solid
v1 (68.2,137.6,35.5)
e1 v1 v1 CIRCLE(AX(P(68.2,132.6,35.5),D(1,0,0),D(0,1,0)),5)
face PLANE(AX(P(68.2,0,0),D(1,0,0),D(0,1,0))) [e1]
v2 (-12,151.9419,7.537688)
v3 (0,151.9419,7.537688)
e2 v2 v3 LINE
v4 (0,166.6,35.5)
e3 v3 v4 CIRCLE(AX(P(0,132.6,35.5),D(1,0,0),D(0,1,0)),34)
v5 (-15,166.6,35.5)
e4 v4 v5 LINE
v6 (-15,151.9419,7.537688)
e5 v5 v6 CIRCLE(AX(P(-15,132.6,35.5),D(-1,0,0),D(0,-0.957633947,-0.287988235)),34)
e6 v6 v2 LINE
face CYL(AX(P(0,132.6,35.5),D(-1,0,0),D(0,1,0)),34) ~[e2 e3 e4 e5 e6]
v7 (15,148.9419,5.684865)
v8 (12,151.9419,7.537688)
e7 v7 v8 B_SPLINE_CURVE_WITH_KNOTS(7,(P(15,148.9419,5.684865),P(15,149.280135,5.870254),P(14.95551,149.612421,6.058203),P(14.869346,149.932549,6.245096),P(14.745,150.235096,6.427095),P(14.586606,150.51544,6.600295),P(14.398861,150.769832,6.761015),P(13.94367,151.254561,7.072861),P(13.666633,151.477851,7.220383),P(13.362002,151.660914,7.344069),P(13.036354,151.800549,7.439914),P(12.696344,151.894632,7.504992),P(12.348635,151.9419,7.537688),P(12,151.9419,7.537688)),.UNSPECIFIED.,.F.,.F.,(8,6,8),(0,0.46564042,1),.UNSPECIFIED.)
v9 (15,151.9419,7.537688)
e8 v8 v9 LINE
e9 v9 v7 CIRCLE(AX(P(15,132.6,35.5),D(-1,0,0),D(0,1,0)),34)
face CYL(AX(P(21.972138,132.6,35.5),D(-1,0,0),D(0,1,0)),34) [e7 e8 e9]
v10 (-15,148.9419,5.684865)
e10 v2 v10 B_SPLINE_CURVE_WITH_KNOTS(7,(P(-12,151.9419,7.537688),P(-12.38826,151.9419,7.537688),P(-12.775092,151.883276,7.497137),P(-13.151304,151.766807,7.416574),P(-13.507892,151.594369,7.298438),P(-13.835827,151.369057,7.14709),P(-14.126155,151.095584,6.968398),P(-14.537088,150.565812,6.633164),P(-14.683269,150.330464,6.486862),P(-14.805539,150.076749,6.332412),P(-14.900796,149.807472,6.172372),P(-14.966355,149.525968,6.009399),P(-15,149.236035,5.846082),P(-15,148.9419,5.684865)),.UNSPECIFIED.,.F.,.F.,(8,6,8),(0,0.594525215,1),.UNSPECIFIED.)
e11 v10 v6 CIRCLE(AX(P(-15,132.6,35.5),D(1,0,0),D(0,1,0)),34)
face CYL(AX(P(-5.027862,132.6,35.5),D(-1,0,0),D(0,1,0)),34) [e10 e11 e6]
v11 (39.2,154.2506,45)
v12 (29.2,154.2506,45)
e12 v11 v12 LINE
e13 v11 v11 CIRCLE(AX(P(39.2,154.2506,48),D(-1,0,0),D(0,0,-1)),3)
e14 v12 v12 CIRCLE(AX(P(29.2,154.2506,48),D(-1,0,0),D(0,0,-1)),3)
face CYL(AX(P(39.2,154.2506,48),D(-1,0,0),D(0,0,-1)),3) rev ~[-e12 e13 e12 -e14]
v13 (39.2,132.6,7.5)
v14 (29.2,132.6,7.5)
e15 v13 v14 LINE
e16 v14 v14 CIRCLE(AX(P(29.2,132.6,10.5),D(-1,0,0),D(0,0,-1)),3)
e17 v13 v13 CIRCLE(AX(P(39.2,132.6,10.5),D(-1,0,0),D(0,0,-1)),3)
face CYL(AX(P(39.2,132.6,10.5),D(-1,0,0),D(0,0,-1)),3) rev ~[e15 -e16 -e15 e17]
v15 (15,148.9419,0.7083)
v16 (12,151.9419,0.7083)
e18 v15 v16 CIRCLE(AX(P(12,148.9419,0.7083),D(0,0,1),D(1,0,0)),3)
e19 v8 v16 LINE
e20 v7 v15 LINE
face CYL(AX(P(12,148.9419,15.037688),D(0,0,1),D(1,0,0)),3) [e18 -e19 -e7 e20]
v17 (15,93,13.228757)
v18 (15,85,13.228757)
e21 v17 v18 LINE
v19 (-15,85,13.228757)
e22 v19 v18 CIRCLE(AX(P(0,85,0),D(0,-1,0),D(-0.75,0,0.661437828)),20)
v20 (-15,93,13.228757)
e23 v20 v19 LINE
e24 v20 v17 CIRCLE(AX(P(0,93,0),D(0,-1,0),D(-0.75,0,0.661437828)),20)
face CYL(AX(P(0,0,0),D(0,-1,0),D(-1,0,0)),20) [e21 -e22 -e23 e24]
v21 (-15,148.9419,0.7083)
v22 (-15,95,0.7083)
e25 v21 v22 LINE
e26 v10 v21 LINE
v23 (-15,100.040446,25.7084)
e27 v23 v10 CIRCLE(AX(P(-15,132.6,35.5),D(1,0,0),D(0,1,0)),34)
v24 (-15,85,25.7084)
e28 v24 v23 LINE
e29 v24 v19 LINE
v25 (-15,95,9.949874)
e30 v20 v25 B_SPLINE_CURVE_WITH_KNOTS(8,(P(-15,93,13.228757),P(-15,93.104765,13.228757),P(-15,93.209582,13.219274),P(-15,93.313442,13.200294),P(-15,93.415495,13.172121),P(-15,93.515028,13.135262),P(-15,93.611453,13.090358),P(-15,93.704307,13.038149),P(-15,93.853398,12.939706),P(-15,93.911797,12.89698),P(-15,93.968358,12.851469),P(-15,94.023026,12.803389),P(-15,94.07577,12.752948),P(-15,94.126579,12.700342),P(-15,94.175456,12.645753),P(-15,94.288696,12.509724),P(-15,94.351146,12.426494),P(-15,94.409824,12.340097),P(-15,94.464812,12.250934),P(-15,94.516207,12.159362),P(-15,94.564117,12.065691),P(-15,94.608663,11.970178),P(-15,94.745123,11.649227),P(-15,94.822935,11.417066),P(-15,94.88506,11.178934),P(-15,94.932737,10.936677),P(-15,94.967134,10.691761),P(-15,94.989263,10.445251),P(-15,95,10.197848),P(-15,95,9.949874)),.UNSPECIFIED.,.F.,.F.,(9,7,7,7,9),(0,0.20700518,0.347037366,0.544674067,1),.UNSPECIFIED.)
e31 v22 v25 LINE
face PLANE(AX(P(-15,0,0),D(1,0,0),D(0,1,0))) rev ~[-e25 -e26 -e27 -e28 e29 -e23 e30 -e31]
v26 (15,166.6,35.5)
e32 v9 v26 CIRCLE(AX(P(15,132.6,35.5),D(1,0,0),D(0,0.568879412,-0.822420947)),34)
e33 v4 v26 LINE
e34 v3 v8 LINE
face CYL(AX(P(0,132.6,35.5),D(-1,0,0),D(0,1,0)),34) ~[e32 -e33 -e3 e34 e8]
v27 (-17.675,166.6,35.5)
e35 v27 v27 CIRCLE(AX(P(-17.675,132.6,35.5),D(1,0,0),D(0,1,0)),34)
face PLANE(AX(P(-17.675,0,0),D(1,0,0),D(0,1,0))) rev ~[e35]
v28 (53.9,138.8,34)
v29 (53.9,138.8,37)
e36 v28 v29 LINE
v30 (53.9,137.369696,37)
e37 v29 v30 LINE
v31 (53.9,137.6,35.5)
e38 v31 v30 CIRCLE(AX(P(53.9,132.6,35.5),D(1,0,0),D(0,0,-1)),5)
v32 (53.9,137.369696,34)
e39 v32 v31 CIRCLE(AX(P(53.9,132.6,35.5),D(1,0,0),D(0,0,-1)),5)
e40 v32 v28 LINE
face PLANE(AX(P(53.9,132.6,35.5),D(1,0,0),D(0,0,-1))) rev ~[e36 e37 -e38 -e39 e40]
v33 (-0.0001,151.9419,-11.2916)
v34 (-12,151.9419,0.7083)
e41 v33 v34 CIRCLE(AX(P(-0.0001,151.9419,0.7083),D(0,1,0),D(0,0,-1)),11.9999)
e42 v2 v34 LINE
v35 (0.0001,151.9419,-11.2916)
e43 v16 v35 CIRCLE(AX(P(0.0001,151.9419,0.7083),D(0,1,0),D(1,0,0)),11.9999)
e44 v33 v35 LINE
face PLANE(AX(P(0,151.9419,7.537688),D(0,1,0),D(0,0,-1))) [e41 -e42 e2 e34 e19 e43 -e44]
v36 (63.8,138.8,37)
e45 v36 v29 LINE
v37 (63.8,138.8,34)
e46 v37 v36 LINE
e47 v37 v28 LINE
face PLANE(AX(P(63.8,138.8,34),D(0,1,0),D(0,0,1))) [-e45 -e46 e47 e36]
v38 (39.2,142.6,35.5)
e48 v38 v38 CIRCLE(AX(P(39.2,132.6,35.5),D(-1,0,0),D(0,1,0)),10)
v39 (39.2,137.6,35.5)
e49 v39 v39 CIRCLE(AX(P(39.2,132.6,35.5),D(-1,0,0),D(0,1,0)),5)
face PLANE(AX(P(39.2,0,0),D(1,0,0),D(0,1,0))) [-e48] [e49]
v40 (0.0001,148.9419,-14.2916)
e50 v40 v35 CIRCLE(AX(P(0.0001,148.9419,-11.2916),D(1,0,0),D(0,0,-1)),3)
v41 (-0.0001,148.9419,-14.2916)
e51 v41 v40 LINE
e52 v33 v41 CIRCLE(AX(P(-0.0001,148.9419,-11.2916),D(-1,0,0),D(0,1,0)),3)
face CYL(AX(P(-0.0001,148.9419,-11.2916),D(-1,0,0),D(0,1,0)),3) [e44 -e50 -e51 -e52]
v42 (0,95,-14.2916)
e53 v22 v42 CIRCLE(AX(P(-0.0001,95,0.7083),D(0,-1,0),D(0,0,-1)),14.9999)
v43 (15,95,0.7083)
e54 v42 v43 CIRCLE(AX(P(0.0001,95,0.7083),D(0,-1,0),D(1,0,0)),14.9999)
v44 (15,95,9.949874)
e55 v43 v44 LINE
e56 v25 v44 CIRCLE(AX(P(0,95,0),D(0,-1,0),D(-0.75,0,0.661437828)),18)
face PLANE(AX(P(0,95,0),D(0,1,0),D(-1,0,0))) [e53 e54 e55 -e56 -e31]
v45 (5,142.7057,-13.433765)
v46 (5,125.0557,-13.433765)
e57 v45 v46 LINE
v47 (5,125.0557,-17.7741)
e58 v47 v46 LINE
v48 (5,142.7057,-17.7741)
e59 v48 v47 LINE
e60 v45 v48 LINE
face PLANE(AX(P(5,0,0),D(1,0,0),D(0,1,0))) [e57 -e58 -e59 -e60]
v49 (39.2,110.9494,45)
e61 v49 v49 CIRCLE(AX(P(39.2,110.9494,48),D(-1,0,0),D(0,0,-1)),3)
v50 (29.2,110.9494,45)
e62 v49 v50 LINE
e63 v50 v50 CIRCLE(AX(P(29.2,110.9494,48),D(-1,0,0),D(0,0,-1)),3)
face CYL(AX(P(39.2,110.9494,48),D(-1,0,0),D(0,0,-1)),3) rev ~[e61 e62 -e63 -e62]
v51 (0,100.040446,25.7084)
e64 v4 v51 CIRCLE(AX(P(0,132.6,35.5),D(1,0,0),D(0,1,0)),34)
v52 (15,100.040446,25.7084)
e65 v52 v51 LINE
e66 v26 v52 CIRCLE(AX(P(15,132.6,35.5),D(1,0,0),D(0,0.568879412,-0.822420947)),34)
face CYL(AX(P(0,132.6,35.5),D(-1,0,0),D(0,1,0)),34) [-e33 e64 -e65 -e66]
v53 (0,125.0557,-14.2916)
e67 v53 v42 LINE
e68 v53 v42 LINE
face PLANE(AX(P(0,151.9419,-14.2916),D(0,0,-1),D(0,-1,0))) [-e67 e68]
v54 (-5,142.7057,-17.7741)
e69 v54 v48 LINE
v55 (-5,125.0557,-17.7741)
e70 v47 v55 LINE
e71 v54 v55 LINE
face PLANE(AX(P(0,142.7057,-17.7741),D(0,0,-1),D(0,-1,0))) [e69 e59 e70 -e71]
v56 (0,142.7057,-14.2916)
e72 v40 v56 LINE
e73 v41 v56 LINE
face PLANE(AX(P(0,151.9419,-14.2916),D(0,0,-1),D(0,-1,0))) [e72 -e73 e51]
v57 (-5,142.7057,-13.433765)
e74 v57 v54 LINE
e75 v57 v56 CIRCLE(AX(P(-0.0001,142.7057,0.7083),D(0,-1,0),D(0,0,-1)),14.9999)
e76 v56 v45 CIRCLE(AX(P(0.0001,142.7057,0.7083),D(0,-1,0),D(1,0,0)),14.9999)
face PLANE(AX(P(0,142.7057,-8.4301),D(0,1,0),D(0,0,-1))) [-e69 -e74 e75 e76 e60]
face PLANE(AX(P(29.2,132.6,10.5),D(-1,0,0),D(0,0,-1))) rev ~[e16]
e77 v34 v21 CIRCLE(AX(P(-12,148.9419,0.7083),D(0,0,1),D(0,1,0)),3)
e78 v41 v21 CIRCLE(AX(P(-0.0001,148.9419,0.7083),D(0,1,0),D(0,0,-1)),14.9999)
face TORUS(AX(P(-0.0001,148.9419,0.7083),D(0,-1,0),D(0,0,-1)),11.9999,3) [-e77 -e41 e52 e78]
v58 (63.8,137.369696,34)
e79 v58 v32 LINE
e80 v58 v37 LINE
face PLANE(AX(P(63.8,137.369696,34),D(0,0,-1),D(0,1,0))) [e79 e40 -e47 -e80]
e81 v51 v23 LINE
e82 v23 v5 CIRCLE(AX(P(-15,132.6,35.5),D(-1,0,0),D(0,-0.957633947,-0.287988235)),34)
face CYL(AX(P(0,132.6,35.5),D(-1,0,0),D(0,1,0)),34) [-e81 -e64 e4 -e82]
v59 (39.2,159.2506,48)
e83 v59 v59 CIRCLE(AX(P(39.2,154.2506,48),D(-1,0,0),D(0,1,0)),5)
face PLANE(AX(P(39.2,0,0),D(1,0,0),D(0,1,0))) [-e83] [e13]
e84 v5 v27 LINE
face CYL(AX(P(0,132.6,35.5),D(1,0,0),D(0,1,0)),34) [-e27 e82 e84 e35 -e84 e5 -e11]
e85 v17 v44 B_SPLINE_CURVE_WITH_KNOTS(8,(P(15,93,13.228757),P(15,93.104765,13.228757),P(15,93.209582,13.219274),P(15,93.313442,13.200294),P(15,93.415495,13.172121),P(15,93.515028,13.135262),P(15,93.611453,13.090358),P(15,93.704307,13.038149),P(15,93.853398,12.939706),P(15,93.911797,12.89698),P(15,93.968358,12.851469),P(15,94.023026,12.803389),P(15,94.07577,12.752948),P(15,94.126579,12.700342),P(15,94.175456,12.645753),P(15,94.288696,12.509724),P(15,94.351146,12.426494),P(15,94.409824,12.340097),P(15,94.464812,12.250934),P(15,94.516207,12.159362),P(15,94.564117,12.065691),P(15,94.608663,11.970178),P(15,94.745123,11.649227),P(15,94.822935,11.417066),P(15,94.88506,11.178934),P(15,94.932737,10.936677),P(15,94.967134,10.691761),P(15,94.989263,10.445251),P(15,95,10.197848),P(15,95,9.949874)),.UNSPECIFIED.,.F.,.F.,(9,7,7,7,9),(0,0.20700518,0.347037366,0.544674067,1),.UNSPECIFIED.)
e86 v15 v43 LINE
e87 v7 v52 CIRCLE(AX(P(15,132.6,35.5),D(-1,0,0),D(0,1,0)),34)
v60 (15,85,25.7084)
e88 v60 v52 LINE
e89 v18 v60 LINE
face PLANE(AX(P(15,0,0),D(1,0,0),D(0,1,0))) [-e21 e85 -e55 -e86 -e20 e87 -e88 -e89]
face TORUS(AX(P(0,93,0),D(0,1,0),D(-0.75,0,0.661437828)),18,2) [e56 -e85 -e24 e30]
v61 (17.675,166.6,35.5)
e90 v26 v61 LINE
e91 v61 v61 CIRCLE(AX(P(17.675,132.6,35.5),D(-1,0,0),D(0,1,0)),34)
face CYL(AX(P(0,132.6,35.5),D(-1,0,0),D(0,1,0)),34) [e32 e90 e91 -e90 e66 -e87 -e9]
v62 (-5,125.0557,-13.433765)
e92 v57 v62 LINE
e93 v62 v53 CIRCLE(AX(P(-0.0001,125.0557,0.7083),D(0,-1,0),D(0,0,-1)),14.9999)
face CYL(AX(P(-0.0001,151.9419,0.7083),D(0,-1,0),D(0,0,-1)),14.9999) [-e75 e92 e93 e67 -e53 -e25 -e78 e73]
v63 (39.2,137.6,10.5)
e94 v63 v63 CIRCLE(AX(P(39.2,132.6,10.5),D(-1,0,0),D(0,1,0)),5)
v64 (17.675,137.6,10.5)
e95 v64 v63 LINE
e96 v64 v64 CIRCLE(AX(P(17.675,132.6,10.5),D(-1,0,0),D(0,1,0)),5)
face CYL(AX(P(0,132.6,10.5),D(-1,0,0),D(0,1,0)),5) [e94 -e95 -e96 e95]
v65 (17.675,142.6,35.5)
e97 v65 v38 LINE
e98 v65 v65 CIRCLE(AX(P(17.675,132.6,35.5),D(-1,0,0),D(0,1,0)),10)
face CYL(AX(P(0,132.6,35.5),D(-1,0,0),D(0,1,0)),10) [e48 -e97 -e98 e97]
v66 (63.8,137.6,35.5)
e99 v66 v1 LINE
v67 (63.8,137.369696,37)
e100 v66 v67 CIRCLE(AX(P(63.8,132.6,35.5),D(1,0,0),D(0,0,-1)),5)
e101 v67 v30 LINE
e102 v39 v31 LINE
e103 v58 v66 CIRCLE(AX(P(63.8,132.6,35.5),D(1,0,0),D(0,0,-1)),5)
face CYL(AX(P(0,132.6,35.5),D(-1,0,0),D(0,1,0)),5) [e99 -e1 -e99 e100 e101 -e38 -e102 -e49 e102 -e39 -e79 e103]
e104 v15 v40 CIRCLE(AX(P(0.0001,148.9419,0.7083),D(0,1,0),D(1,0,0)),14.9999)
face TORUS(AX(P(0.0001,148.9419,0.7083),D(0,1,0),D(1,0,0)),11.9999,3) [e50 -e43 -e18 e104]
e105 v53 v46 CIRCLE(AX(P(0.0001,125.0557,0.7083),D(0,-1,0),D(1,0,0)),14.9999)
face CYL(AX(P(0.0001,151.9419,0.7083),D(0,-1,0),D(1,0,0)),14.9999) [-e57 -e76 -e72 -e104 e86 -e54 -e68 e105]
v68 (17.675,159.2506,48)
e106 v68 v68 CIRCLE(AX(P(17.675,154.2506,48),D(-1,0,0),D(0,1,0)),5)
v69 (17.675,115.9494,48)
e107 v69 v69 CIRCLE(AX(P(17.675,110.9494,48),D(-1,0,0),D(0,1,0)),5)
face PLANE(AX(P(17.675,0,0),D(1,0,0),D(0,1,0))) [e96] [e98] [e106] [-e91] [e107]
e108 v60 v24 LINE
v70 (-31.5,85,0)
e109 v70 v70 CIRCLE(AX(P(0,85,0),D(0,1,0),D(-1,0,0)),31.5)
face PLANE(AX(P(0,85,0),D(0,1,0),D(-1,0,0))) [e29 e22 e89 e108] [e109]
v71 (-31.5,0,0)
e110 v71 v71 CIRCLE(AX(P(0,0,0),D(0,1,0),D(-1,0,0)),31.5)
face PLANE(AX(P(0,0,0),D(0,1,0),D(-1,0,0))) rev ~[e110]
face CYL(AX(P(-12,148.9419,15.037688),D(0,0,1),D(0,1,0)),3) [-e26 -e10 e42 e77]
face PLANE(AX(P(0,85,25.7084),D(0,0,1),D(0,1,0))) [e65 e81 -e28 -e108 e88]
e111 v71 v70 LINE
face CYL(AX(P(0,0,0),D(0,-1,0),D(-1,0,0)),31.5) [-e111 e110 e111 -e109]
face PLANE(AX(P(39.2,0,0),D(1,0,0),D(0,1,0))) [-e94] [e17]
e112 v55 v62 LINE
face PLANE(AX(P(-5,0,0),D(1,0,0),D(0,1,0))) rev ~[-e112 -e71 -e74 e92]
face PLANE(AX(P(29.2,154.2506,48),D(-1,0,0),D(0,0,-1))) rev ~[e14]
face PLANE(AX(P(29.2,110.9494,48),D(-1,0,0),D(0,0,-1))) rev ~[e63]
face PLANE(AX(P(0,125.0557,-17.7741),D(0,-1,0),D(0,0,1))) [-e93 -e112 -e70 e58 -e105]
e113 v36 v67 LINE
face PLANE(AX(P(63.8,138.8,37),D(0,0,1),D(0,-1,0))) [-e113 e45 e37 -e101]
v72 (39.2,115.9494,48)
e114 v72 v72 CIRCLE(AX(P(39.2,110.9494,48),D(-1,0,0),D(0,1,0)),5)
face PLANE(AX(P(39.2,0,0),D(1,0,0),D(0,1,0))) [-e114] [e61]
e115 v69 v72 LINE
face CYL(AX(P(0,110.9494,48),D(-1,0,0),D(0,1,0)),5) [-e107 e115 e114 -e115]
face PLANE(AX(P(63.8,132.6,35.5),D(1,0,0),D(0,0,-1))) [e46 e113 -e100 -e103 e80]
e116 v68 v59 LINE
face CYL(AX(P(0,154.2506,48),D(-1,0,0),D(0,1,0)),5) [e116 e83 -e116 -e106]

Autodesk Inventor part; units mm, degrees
ref_plane "XZ Plane" through (0, 0, 0) normal (0, 1, 0) x (-1, 0, 0)
sketch "Sketch1" plane through (0, 0, 0) normal (0, 1, 0) x (-1, 0, 0)
  circle A0 centre (0, 0) radius 31.5
  circle A1 centre (0, 0) radius 20
  dimension "d0" = 63
  dimension "d29" = 40
extrude "Extrusion1" add sketch "Sketch1" along normal blind 85 contours A0 | A1
sketch "Sketch2" plane through (0, 0, 0) normal (1, 0, 0) x (0, 1, 0)
  line L0 (0, -31.5) -> (85, -31.5) projected
  line L1 (0, -31.5) -> (0, 69.5)
  line L2 (0, 69.5) -> (166.6, 69.5)
  line L3 (166.6, 69.5) -> (166.6, 35.5)
  line L4 (166.6, 35.5) -> (132.6, 35.5)
  circle A0 centre (132.6, 35.5) radius 34
  circle A1 centre (132.6, 35.5) radius 25
  circle A2 centre (132.6, 10.5) radius 5
  circle A3 centre (132.6, 10.5) radius 3
  circle A4 centre (154.2506, 48) radius 5
  circle A5 centre (154.2506, 48) radius 3
  circle A6 centre (110.9494, 48) radius 5
  circle A7 centre (110.9494, 48) radius 3
  line L5 (85, -31.5) -> (85, 31.5) projected
  line L6 (85, 25.7084) -> (151.9419, 25.7084)
  line L7 (151.9419, 25.7084) -> (151.9419, -14.2916)
  line L8 (151.9419, -14.2916) -> (85, -14.2916)
  line L9 (85, -14.2916) -> (85, 25.7084)
  circle A8 centre (132.6, 35.5) radius 10
  circle A9 centre (132.6, 35.5) radius 5
  line L10 (85, 31.5) -> (85, 0)
  line L11 (85, 0) -> (100.814, 0)
  point P0 (0, 0)
  point P1 (151.9419, 7.5377)
  point P2 (134.9384, 1.5805)
  point P3 (130.2616, 1.5805)
  point P4 (100.0404, 25.7084)
  point P5 (92.907, 0)
  dimension "d8" = 50
  dimension "d3" = 101
  dimension "d4" = 166.6
  dimension "d5" = 34
  dimension "d6" = 34
  dimension "d7" = 68
  dimension "d9" = 10
  dimension "d10" = 6
  dimension "d13" = 360
  dimension "d21" = 20
  dimension "d22" = 10
  dimension "d26" = 40
  dimension "d49" = 69.5
  dimension "d50" = 35.5
extrude "Extrusion2" add sketch "Sketch2" along normal mid plane 30 contours L5 L6 A0 L7 L8 | A0 L4 A1 A4 A6 L6 | A0 L7 A1 L4 | L6 A1 A2 L7 A0 | A1 L7 L6 A8 L4 | L4 A8 L6 A1 A6 A4 | L6 A8 L7 A1 A2 | A8 L6 | A4 A1 A5 | A1 A5 A4 | A6 A1 A7 | A1 A7 A6 | L6 A8 | A5 A1 | A1 A5 | A7 A1 | A1 A7 | A9
extrude "Extrusion3" add sketch "Sketch2" along normal blind 39.2 contours A8 L6 | A4 A1 A5 | A1 A5 A4 | A6 A1 A7 | A1 A7 A6 | A2 A1 A3 | A1 A3 A2 | L6 A8 | A5 A1 | A1 A5 | A7 A1 | A1 A7 | A3 A1 | A1 A3 | A9
extrude "Extrusion4" add sketch "Sketch2" along normal mid plane 35.35 contours A0 L4 A1 A4 A6 L6 | A0 L7 A1 L4 | L6 A1 A2 L7 A0 | A1 L7 L6 A8 L4 | L4 A8 L6 A1 A6 A4 | L6 A8 L7 A1 A2 | A8 L6 | A4 A1 A5 | A1 A5 A4 | A6 A1 A7 | A1 A7 A6 | A2 A1 A3 | A1 A3 A2 | L6 A8 | A5 A1 | A1 A5 | A7 A1 | A1 A7 | A3 A1 | A1 A3 | A9
extrude "Extrusion5" add sketch "Sketch2" along normal blind 68.2 contours A9
ref_plane "Work Plane1" through (-31.5, 0, 0) normal (1, 0, 0) x (0, 1, 0)
fillet "Fillet1" radius 15 2 edges at (15, 118.471, -14.2916) (-15, 118.471, -14.2916)
fillet "Fillet2" radius 3 3 edges at (15, 151.9419, 4.123) (-15, 151.9419, 4.123) (10.6066, 151.9419, -9.8982)
extrude "Extrusion6" add sketch "Sketch1" along normal blind 95 contours A1
fillet "Fillet3" radius 2 1 edges at (0, 95, -20)
ref_plane "Work Plane2" through (63.8, 132.6, 35.5) normal (1, 0, 0) x (0, 0, -1)
sketch "Sketch3" plane through (39.2, 154.2506, 48) normal (1, 0, 0) x (0, 0, -1)
  circle A0 centre (0, 0) radius 3
  circle A1 centre (37.5, -21.6506) radius 5 projected
  circle A2 centre (37.5, -21.6506) radius 3
  circle A3 centre (0, -43.3013) radius 5 projected
  circle A4 centre (0, -43.3013) radius 3
  point P0 (48, -154.2506)
  dimension "d33" = 6
  dimension "d34" = 6
  dimension "d35" = 6
hole "Hole1" at (39.2, 154.2506, 48) at (39.2, 132.6, 10.5) at (39.2, 110.9494, 48) direction (-1, 0, 0) diameter 6 depth 10
sketch "Sketch4" plane through (63.8, 132.6, 35.5) normal (1, 0, 0) x (0, 0, -1)
  line L0 (-1.5, 3.8) -> (1.5, 3.8)
  line L1 (1.5, 3.8) -> (1.5, 6.2)
  line L2 (1.5, 6.2) -> (-1.5, 6.2)
  line L3 (-1.5, 6.2) -> (-1.5, 3.8)
  circle A0 centre (0, 0) radius 5 projected
  line L4 (-1.5, 3.8) -> (1.5, 6.2) construction
  line L5 (1.5, 3.8) -> (-1.5, 6.2) construction
  point P0 (35.5, -132.6)
  point P1 (0, 5)
  point P2 (-1.5, 4.7697)
  point P3 (1.5, 4.7697)
  dimension "d43" = 1.2
  dimension "d44" = 3
extrude "Extrusion7" add sketch "Sketch4" against normal blind 9.9 contours L3 L2 L1 A0
ref_plane "Work Plane3" through (0, 0, -31.5) normal (0, 0, 1) x (1, 0, 0)
sketch "Sketch5" plane through (68.2, 132.6, 35.5) normal (1, 0, 0) x (0, 0, -1)
  circle A0 centre (0, 0) radius 10 construction
  circle A1 centre (25, 0) radius 3 construction
  line L0 (0, 0) -> (25, 0) construction
  line L1 (49.7916, -37.6) -> (49.7916, 16.3419) projected
  circle A2 centre (0, 0) radius 34 projected
  line L2 (49.7916, 0) -> (-34, 0)
  point P0 (35.5, -132.6)
sketch "Sketch6" plane through (0, 0, 0) normal (1, 0, 0) x (0, 1, 0)
  line L0 (142.7057, -17.7741) -> (125.0557, -17.7741)
  line L1 (125.0557, -17.7741) -> (125.0557, -8.4301)
  line L2 (125.0557, -8.4301) -> (142.7057, -8.4301)
  line L3 (142.7057, -8.4301) -> (142.7057, -17.7741)
  circle A0 centre (132.6, 35.5) radius 34 projected
  point P0 (0, 0)
  point P1 (133.8807, 69.4759)
  point P2 (133.8807, -17.7741)
  dimension "d51" = 87.25
  dimension "d52" = 17.65
extrude "Extrusion8" add sketch "Sketch6" along normal mid plane 10 contours L0 L1 L2 L3
properties part number "motor" material "ABS Plastic"
